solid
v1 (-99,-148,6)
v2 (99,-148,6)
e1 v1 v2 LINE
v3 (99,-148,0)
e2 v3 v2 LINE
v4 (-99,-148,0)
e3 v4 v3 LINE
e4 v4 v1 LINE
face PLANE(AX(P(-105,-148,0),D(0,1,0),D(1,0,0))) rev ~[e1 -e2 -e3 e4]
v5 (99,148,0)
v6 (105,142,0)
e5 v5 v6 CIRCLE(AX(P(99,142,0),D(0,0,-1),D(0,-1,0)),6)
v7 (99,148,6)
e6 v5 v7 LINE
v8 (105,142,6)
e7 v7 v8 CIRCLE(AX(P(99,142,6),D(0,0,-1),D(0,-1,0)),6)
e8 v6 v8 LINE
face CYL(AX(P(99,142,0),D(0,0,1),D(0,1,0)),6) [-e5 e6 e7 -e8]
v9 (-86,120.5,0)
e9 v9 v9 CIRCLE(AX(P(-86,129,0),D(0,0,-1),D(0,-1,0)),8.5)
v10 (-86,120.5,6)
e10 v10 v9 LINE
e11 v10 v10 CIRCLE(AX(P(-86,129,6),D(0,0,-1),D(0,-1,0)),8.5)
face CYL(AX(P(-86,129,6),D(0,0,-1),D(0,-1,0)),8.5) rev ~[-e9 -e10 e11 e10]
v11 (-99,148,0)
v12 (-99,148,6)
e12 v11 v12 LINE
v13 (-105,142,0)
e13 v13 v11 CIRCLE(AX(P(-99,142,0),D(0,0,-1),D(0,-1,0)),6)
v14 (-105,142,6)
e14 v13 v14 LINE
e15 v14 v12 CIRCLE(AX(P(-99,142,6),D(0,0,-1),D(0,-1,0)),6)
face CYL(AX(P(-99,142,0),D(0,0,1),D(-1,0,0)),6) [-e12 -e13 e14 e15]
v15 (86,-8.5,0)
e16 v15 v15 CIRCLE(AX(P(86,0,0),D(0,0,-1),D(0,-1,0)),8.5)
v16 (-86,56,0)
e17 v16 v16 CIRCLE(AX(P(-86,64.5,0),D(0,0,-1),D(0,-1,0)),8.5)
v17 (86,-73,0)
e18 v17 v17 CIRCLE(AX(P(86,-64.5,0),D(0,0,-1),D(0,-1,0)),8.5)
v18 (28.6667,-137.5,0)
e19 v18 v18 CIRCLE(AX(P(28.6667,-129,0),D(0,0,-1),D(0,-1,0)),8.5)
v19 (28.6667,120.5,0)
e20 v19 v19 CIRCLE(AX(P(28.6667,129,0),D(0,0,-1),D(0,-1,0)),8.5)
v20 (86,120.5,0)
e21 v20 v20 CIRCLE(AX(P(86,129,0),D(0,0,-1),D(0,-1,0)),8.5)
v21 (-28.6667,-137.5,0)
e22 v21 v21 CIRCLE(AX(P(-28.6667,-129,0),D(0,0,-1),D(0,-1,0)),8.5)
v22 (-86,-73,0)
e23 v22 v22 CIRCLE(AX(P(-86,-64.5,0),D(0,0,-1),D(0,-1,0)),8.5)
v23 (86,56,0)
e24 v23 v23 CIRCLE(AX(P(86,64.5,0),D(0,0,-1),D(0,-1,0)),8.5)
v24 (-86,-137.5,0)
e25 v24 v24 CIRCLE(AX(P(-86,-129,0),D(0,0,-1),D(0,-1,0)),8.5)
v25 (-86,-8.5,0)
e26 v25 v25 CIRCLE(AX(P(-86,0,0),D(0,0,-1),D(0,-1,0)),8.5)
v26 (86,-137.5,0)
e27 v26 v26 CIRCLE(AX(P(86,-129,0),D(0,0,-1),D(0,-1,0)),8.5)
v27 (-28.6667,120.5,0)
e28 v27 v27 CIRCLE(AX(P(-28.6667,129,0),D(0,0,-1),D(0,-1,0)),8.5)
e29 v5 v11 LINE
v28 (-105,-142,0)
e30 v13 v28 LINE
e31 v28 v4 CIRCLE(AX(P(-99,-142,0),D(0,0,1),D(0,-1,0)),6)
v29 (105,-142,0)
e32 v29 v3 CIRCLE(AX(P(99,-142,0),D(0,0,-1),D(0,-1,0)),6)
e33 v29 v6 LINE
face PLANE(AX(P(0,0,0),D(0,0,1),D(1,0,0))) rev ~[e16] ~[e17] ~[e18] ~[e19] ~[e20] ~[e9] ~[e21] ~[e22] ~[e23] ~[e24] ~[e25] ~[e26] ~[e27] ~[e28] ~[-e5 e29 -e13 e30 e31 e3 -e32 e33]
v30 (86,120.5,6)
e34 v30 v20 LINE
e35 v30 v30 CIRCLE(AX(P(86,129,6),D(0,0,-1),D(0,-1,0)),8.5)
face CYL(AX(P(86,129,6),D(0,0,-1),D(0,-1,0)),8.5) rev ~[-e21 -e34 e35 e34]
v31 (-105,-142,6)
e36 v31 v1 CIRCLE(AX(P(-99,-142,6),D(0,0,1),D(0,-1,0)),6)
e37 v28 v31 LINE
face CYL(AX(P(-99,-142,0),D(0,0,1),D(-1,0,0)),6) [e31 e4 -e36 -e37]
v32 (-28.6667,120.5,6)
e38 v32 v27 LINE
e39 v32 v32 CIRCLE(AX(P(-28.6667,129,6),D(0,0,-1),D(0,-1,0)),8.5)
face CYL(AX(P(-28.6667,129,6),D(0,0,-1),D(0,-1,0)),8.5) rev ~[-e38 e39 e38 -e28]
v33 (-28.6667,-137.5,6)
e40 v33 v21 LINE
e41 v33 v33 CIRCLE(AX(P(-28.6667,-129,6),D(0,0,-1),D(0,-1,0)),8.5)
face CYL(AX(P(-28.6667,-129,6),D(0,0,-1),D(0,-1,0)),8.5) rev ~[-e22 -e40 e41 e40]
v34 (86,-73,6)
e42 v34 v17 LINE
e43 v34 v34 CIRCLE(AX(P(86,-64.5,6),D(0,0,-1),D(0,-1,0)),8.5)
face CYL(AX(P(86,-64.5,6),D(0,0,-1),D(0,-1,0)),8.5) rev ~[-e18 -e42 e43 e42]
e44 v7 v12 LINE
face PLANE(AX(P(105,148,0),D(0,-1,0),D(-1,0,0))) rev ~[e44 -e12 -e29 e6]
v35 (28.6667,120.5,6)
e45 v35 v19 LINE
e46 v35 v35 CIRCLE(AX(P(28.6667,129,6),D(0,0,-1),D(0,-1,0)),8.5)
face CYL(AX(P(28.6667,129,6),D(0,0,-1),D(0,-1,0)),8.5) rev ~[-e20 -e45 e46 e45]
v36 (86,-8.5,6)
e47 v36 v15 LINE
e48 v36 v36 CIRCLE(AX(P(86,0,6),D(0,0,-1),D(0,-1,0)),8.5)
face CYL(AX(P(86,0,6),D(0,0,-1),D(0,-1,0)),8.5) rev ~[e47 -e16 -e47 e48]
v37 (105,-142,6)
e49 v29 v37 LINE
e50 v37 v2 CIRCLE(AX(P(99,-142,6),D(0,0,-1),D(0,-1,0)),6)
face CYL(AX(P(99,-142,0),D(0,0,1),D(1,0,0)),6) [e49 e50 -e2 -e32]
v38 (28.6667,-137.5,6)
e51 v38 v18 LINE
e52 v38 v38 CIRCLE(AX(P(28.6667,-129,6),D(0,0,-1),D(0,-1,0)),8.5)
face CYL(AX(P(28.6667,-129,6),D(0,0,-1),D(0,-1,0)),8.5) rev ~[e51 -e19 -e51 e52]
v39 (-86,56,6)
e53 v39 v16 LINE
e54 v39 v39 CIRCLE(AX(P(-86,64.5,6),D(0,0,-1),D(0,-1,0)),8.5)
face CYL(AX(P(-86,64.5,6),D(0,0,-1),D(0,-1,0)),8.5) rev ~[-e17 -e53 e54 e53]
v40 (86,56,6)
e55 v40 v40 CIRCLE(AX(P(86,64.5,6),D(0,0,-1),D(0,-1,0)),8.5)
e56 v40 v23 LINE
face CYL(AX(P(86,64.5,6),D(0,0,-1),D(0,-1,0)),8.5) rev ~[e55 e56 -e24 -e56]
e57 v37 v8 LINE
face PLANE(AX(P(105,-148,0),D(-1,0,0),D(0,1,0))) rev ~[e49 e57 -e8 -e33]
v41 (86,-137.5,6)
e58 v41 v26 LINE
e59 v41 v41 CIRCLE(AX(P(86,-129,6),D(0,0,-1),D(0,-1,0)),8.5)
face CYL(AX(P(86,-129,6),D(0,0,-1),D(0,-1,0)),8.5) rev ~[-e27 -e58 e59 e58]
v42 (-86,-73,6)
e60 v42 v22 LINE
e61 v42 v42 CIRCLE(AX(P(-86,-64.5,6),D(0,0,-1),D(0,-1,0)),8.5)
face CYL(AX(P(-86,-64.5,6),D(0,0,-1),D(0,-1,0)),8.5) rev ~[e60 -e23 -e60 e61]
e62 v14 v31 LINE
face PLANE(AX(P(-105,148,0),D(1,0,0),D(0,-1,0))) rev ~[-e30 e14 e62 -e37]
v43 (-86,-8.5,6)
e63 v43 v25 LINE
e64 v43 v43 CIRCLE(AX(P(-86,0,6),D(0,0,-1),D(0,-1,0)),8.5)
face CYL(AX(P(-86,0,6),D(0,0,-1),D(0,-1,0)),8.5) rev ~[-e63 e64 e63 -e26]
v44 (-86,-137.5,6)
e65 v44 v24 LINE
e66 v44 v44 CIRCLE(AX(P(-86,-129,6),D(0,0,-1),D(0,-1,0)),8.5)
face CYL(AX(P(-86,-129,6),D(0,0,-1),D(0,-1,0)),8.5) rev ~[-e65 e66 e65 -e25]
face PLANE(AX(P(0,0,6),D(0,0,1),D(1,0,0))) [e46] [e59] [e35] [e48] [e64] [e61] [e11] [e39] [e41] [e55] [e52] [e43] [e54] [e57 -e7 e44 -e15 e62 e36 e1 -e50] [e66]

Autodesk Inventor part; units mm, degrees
ref_plane "YZ Plane" through (0, 0, 0) normal (1, 0, 0) x (0, 1, 0)
ref_plane "XZ Plane" through (0, 0, 0) normal (0, 1, 0) x (-1, 0, 0)
ref_plane "XY Plane" through (0, 0, 0) normal (0, 0, 1) x (1, 0, 0)
sketch "Sketch2" plane through (0, 0, 0) normal (0, 0, 1) x (1, 0, 0)
  line L0 (-55, -98) -> (55, -98)
  line L1 (55, -98) -> (55, 98)
  line L2 (55, 98) -> (-55, 98)
  line L3 (-55, 98) -> (-55, -98)
  line L4 (-55, -98) -> (55, 98) construction
  line L5 (55, -98) -> (-55, 98) construction
  line L6 (-105, -148) -> (105, -148)
  line L7 (105, -148) -> (105, 148)
  line L8 (105, 148) -> (-105, 148)
  line L9 (-105, 148) -> (-105, -148)
  point P0 (0, 0)
  dimension "d31" = 50
  dimension "d60" = 196
  dimension "d61" = 110
extrude "Plate2" add sketch "Sketch2" along normal blind 6 contours L3 L2 L1 L0 | L9 L8 L7 L6
sketch "Sketch5" plane through (0, 0, 6) normal (0, 0, 1) x (1, 0, 0)
  line L0 (105, -148) -> (-105, -148) construction
  line L1 (105, 148) -> (105, -148) construction
  line L2 (-105, 148) -> (105, 148) construction
  line L3 (-105, -148) -> (-105, 148) construction
  line L4 (-86, 129) -> (86, 129) construction
  line L5 (86, 129) -> (86, -129) construction
  line L6 (86, -129) -> (-86, -129) construction
  line L7 (-86, -129) -> (-86, 129) construction
  line L8 (-28.6667, -129) -> (28.6667, -129)
  line L9 (28.6667, -129) -> (28.6667, 129) construction
  line L10 (28.6667, 129) -> (-28.6667, 129)
  line L11 (-28.6667, 129) -> (-28.6667, -129) construction
  line L12 (-28.6667, 0) -> (28.6667, 0) construction
  point P0 (0, 0)
  point P1 (0, -129)
  point P2 (-86, -64.5)
  point P3 (-86, 0)
  point P4 (-86, 64.5)
  point P5 (86, 64.5)
  point P6 (86, 0)
  point P7 (86, -64.5)
  point P8 (0, 0)
  dimension "d34" = 19
  dimension "d47" = 64.5
  dimension "d48" = 64.5
  dimension "d49" = 57.3333
  dimension "d50" = 57.3333
fillet "Corner Round1" radius 6 4 edges at (-105, -148, 3) (-105, 148, 3) (105, 148, 3) (105, -148, 3)
hole "Hole1" at (-86, -129, 6) at (-86, -64.5, 6) at (-86, 0, 6) at (-86, 64.5, 6) at (-86, 129, 6) at (86, 129, 6) at (86, 64.5, 6) at (86, 0, 6) at (86, -64.5, 6) at (86, -129, 6) at (-28.6667, -129, 6) at (28.6667, 129, 6) at (28.6667, -129, 6) at (-28.6667, 129, 6) direction (0, 0, -1) diameter 17 end through all
equation "\"d47\" = d48"
equation "\"d49\" = d50"
equation "\"d60\" = ChargingHatch_width - 2 * Thickness"
equation "\"d61\" = ChargingHatch_hight - 2 * Thickness"
equation "\"d56\" = Thickness"
equation "\"d14\" = Thickness"
equation "\"BendReliefWidth\" = Thickness"
equation "\"BendReliefDepth\" = 0.5 * Thickness"
equation "\"CornerReliefSize\" = 4 * Thickness"
equation "\"MinimumRemnant\" = 2 * Thickness"
equation "\"TransitionRadius\" = BendRadius"
equation "\"JacobiRadiusSize\" = BendRadius"
equation "\"GapSize\" = Thickness"
equation "\"ChargingHatch_width\" = 208"
equation "\"Thickness\" = 6"
equation "\"ChargingHatch_hight\" = 122"
equation "\"BendRadius\" = 6"
properties part number "PRS 9607 charging flange rect_D1200" material "Steel"
